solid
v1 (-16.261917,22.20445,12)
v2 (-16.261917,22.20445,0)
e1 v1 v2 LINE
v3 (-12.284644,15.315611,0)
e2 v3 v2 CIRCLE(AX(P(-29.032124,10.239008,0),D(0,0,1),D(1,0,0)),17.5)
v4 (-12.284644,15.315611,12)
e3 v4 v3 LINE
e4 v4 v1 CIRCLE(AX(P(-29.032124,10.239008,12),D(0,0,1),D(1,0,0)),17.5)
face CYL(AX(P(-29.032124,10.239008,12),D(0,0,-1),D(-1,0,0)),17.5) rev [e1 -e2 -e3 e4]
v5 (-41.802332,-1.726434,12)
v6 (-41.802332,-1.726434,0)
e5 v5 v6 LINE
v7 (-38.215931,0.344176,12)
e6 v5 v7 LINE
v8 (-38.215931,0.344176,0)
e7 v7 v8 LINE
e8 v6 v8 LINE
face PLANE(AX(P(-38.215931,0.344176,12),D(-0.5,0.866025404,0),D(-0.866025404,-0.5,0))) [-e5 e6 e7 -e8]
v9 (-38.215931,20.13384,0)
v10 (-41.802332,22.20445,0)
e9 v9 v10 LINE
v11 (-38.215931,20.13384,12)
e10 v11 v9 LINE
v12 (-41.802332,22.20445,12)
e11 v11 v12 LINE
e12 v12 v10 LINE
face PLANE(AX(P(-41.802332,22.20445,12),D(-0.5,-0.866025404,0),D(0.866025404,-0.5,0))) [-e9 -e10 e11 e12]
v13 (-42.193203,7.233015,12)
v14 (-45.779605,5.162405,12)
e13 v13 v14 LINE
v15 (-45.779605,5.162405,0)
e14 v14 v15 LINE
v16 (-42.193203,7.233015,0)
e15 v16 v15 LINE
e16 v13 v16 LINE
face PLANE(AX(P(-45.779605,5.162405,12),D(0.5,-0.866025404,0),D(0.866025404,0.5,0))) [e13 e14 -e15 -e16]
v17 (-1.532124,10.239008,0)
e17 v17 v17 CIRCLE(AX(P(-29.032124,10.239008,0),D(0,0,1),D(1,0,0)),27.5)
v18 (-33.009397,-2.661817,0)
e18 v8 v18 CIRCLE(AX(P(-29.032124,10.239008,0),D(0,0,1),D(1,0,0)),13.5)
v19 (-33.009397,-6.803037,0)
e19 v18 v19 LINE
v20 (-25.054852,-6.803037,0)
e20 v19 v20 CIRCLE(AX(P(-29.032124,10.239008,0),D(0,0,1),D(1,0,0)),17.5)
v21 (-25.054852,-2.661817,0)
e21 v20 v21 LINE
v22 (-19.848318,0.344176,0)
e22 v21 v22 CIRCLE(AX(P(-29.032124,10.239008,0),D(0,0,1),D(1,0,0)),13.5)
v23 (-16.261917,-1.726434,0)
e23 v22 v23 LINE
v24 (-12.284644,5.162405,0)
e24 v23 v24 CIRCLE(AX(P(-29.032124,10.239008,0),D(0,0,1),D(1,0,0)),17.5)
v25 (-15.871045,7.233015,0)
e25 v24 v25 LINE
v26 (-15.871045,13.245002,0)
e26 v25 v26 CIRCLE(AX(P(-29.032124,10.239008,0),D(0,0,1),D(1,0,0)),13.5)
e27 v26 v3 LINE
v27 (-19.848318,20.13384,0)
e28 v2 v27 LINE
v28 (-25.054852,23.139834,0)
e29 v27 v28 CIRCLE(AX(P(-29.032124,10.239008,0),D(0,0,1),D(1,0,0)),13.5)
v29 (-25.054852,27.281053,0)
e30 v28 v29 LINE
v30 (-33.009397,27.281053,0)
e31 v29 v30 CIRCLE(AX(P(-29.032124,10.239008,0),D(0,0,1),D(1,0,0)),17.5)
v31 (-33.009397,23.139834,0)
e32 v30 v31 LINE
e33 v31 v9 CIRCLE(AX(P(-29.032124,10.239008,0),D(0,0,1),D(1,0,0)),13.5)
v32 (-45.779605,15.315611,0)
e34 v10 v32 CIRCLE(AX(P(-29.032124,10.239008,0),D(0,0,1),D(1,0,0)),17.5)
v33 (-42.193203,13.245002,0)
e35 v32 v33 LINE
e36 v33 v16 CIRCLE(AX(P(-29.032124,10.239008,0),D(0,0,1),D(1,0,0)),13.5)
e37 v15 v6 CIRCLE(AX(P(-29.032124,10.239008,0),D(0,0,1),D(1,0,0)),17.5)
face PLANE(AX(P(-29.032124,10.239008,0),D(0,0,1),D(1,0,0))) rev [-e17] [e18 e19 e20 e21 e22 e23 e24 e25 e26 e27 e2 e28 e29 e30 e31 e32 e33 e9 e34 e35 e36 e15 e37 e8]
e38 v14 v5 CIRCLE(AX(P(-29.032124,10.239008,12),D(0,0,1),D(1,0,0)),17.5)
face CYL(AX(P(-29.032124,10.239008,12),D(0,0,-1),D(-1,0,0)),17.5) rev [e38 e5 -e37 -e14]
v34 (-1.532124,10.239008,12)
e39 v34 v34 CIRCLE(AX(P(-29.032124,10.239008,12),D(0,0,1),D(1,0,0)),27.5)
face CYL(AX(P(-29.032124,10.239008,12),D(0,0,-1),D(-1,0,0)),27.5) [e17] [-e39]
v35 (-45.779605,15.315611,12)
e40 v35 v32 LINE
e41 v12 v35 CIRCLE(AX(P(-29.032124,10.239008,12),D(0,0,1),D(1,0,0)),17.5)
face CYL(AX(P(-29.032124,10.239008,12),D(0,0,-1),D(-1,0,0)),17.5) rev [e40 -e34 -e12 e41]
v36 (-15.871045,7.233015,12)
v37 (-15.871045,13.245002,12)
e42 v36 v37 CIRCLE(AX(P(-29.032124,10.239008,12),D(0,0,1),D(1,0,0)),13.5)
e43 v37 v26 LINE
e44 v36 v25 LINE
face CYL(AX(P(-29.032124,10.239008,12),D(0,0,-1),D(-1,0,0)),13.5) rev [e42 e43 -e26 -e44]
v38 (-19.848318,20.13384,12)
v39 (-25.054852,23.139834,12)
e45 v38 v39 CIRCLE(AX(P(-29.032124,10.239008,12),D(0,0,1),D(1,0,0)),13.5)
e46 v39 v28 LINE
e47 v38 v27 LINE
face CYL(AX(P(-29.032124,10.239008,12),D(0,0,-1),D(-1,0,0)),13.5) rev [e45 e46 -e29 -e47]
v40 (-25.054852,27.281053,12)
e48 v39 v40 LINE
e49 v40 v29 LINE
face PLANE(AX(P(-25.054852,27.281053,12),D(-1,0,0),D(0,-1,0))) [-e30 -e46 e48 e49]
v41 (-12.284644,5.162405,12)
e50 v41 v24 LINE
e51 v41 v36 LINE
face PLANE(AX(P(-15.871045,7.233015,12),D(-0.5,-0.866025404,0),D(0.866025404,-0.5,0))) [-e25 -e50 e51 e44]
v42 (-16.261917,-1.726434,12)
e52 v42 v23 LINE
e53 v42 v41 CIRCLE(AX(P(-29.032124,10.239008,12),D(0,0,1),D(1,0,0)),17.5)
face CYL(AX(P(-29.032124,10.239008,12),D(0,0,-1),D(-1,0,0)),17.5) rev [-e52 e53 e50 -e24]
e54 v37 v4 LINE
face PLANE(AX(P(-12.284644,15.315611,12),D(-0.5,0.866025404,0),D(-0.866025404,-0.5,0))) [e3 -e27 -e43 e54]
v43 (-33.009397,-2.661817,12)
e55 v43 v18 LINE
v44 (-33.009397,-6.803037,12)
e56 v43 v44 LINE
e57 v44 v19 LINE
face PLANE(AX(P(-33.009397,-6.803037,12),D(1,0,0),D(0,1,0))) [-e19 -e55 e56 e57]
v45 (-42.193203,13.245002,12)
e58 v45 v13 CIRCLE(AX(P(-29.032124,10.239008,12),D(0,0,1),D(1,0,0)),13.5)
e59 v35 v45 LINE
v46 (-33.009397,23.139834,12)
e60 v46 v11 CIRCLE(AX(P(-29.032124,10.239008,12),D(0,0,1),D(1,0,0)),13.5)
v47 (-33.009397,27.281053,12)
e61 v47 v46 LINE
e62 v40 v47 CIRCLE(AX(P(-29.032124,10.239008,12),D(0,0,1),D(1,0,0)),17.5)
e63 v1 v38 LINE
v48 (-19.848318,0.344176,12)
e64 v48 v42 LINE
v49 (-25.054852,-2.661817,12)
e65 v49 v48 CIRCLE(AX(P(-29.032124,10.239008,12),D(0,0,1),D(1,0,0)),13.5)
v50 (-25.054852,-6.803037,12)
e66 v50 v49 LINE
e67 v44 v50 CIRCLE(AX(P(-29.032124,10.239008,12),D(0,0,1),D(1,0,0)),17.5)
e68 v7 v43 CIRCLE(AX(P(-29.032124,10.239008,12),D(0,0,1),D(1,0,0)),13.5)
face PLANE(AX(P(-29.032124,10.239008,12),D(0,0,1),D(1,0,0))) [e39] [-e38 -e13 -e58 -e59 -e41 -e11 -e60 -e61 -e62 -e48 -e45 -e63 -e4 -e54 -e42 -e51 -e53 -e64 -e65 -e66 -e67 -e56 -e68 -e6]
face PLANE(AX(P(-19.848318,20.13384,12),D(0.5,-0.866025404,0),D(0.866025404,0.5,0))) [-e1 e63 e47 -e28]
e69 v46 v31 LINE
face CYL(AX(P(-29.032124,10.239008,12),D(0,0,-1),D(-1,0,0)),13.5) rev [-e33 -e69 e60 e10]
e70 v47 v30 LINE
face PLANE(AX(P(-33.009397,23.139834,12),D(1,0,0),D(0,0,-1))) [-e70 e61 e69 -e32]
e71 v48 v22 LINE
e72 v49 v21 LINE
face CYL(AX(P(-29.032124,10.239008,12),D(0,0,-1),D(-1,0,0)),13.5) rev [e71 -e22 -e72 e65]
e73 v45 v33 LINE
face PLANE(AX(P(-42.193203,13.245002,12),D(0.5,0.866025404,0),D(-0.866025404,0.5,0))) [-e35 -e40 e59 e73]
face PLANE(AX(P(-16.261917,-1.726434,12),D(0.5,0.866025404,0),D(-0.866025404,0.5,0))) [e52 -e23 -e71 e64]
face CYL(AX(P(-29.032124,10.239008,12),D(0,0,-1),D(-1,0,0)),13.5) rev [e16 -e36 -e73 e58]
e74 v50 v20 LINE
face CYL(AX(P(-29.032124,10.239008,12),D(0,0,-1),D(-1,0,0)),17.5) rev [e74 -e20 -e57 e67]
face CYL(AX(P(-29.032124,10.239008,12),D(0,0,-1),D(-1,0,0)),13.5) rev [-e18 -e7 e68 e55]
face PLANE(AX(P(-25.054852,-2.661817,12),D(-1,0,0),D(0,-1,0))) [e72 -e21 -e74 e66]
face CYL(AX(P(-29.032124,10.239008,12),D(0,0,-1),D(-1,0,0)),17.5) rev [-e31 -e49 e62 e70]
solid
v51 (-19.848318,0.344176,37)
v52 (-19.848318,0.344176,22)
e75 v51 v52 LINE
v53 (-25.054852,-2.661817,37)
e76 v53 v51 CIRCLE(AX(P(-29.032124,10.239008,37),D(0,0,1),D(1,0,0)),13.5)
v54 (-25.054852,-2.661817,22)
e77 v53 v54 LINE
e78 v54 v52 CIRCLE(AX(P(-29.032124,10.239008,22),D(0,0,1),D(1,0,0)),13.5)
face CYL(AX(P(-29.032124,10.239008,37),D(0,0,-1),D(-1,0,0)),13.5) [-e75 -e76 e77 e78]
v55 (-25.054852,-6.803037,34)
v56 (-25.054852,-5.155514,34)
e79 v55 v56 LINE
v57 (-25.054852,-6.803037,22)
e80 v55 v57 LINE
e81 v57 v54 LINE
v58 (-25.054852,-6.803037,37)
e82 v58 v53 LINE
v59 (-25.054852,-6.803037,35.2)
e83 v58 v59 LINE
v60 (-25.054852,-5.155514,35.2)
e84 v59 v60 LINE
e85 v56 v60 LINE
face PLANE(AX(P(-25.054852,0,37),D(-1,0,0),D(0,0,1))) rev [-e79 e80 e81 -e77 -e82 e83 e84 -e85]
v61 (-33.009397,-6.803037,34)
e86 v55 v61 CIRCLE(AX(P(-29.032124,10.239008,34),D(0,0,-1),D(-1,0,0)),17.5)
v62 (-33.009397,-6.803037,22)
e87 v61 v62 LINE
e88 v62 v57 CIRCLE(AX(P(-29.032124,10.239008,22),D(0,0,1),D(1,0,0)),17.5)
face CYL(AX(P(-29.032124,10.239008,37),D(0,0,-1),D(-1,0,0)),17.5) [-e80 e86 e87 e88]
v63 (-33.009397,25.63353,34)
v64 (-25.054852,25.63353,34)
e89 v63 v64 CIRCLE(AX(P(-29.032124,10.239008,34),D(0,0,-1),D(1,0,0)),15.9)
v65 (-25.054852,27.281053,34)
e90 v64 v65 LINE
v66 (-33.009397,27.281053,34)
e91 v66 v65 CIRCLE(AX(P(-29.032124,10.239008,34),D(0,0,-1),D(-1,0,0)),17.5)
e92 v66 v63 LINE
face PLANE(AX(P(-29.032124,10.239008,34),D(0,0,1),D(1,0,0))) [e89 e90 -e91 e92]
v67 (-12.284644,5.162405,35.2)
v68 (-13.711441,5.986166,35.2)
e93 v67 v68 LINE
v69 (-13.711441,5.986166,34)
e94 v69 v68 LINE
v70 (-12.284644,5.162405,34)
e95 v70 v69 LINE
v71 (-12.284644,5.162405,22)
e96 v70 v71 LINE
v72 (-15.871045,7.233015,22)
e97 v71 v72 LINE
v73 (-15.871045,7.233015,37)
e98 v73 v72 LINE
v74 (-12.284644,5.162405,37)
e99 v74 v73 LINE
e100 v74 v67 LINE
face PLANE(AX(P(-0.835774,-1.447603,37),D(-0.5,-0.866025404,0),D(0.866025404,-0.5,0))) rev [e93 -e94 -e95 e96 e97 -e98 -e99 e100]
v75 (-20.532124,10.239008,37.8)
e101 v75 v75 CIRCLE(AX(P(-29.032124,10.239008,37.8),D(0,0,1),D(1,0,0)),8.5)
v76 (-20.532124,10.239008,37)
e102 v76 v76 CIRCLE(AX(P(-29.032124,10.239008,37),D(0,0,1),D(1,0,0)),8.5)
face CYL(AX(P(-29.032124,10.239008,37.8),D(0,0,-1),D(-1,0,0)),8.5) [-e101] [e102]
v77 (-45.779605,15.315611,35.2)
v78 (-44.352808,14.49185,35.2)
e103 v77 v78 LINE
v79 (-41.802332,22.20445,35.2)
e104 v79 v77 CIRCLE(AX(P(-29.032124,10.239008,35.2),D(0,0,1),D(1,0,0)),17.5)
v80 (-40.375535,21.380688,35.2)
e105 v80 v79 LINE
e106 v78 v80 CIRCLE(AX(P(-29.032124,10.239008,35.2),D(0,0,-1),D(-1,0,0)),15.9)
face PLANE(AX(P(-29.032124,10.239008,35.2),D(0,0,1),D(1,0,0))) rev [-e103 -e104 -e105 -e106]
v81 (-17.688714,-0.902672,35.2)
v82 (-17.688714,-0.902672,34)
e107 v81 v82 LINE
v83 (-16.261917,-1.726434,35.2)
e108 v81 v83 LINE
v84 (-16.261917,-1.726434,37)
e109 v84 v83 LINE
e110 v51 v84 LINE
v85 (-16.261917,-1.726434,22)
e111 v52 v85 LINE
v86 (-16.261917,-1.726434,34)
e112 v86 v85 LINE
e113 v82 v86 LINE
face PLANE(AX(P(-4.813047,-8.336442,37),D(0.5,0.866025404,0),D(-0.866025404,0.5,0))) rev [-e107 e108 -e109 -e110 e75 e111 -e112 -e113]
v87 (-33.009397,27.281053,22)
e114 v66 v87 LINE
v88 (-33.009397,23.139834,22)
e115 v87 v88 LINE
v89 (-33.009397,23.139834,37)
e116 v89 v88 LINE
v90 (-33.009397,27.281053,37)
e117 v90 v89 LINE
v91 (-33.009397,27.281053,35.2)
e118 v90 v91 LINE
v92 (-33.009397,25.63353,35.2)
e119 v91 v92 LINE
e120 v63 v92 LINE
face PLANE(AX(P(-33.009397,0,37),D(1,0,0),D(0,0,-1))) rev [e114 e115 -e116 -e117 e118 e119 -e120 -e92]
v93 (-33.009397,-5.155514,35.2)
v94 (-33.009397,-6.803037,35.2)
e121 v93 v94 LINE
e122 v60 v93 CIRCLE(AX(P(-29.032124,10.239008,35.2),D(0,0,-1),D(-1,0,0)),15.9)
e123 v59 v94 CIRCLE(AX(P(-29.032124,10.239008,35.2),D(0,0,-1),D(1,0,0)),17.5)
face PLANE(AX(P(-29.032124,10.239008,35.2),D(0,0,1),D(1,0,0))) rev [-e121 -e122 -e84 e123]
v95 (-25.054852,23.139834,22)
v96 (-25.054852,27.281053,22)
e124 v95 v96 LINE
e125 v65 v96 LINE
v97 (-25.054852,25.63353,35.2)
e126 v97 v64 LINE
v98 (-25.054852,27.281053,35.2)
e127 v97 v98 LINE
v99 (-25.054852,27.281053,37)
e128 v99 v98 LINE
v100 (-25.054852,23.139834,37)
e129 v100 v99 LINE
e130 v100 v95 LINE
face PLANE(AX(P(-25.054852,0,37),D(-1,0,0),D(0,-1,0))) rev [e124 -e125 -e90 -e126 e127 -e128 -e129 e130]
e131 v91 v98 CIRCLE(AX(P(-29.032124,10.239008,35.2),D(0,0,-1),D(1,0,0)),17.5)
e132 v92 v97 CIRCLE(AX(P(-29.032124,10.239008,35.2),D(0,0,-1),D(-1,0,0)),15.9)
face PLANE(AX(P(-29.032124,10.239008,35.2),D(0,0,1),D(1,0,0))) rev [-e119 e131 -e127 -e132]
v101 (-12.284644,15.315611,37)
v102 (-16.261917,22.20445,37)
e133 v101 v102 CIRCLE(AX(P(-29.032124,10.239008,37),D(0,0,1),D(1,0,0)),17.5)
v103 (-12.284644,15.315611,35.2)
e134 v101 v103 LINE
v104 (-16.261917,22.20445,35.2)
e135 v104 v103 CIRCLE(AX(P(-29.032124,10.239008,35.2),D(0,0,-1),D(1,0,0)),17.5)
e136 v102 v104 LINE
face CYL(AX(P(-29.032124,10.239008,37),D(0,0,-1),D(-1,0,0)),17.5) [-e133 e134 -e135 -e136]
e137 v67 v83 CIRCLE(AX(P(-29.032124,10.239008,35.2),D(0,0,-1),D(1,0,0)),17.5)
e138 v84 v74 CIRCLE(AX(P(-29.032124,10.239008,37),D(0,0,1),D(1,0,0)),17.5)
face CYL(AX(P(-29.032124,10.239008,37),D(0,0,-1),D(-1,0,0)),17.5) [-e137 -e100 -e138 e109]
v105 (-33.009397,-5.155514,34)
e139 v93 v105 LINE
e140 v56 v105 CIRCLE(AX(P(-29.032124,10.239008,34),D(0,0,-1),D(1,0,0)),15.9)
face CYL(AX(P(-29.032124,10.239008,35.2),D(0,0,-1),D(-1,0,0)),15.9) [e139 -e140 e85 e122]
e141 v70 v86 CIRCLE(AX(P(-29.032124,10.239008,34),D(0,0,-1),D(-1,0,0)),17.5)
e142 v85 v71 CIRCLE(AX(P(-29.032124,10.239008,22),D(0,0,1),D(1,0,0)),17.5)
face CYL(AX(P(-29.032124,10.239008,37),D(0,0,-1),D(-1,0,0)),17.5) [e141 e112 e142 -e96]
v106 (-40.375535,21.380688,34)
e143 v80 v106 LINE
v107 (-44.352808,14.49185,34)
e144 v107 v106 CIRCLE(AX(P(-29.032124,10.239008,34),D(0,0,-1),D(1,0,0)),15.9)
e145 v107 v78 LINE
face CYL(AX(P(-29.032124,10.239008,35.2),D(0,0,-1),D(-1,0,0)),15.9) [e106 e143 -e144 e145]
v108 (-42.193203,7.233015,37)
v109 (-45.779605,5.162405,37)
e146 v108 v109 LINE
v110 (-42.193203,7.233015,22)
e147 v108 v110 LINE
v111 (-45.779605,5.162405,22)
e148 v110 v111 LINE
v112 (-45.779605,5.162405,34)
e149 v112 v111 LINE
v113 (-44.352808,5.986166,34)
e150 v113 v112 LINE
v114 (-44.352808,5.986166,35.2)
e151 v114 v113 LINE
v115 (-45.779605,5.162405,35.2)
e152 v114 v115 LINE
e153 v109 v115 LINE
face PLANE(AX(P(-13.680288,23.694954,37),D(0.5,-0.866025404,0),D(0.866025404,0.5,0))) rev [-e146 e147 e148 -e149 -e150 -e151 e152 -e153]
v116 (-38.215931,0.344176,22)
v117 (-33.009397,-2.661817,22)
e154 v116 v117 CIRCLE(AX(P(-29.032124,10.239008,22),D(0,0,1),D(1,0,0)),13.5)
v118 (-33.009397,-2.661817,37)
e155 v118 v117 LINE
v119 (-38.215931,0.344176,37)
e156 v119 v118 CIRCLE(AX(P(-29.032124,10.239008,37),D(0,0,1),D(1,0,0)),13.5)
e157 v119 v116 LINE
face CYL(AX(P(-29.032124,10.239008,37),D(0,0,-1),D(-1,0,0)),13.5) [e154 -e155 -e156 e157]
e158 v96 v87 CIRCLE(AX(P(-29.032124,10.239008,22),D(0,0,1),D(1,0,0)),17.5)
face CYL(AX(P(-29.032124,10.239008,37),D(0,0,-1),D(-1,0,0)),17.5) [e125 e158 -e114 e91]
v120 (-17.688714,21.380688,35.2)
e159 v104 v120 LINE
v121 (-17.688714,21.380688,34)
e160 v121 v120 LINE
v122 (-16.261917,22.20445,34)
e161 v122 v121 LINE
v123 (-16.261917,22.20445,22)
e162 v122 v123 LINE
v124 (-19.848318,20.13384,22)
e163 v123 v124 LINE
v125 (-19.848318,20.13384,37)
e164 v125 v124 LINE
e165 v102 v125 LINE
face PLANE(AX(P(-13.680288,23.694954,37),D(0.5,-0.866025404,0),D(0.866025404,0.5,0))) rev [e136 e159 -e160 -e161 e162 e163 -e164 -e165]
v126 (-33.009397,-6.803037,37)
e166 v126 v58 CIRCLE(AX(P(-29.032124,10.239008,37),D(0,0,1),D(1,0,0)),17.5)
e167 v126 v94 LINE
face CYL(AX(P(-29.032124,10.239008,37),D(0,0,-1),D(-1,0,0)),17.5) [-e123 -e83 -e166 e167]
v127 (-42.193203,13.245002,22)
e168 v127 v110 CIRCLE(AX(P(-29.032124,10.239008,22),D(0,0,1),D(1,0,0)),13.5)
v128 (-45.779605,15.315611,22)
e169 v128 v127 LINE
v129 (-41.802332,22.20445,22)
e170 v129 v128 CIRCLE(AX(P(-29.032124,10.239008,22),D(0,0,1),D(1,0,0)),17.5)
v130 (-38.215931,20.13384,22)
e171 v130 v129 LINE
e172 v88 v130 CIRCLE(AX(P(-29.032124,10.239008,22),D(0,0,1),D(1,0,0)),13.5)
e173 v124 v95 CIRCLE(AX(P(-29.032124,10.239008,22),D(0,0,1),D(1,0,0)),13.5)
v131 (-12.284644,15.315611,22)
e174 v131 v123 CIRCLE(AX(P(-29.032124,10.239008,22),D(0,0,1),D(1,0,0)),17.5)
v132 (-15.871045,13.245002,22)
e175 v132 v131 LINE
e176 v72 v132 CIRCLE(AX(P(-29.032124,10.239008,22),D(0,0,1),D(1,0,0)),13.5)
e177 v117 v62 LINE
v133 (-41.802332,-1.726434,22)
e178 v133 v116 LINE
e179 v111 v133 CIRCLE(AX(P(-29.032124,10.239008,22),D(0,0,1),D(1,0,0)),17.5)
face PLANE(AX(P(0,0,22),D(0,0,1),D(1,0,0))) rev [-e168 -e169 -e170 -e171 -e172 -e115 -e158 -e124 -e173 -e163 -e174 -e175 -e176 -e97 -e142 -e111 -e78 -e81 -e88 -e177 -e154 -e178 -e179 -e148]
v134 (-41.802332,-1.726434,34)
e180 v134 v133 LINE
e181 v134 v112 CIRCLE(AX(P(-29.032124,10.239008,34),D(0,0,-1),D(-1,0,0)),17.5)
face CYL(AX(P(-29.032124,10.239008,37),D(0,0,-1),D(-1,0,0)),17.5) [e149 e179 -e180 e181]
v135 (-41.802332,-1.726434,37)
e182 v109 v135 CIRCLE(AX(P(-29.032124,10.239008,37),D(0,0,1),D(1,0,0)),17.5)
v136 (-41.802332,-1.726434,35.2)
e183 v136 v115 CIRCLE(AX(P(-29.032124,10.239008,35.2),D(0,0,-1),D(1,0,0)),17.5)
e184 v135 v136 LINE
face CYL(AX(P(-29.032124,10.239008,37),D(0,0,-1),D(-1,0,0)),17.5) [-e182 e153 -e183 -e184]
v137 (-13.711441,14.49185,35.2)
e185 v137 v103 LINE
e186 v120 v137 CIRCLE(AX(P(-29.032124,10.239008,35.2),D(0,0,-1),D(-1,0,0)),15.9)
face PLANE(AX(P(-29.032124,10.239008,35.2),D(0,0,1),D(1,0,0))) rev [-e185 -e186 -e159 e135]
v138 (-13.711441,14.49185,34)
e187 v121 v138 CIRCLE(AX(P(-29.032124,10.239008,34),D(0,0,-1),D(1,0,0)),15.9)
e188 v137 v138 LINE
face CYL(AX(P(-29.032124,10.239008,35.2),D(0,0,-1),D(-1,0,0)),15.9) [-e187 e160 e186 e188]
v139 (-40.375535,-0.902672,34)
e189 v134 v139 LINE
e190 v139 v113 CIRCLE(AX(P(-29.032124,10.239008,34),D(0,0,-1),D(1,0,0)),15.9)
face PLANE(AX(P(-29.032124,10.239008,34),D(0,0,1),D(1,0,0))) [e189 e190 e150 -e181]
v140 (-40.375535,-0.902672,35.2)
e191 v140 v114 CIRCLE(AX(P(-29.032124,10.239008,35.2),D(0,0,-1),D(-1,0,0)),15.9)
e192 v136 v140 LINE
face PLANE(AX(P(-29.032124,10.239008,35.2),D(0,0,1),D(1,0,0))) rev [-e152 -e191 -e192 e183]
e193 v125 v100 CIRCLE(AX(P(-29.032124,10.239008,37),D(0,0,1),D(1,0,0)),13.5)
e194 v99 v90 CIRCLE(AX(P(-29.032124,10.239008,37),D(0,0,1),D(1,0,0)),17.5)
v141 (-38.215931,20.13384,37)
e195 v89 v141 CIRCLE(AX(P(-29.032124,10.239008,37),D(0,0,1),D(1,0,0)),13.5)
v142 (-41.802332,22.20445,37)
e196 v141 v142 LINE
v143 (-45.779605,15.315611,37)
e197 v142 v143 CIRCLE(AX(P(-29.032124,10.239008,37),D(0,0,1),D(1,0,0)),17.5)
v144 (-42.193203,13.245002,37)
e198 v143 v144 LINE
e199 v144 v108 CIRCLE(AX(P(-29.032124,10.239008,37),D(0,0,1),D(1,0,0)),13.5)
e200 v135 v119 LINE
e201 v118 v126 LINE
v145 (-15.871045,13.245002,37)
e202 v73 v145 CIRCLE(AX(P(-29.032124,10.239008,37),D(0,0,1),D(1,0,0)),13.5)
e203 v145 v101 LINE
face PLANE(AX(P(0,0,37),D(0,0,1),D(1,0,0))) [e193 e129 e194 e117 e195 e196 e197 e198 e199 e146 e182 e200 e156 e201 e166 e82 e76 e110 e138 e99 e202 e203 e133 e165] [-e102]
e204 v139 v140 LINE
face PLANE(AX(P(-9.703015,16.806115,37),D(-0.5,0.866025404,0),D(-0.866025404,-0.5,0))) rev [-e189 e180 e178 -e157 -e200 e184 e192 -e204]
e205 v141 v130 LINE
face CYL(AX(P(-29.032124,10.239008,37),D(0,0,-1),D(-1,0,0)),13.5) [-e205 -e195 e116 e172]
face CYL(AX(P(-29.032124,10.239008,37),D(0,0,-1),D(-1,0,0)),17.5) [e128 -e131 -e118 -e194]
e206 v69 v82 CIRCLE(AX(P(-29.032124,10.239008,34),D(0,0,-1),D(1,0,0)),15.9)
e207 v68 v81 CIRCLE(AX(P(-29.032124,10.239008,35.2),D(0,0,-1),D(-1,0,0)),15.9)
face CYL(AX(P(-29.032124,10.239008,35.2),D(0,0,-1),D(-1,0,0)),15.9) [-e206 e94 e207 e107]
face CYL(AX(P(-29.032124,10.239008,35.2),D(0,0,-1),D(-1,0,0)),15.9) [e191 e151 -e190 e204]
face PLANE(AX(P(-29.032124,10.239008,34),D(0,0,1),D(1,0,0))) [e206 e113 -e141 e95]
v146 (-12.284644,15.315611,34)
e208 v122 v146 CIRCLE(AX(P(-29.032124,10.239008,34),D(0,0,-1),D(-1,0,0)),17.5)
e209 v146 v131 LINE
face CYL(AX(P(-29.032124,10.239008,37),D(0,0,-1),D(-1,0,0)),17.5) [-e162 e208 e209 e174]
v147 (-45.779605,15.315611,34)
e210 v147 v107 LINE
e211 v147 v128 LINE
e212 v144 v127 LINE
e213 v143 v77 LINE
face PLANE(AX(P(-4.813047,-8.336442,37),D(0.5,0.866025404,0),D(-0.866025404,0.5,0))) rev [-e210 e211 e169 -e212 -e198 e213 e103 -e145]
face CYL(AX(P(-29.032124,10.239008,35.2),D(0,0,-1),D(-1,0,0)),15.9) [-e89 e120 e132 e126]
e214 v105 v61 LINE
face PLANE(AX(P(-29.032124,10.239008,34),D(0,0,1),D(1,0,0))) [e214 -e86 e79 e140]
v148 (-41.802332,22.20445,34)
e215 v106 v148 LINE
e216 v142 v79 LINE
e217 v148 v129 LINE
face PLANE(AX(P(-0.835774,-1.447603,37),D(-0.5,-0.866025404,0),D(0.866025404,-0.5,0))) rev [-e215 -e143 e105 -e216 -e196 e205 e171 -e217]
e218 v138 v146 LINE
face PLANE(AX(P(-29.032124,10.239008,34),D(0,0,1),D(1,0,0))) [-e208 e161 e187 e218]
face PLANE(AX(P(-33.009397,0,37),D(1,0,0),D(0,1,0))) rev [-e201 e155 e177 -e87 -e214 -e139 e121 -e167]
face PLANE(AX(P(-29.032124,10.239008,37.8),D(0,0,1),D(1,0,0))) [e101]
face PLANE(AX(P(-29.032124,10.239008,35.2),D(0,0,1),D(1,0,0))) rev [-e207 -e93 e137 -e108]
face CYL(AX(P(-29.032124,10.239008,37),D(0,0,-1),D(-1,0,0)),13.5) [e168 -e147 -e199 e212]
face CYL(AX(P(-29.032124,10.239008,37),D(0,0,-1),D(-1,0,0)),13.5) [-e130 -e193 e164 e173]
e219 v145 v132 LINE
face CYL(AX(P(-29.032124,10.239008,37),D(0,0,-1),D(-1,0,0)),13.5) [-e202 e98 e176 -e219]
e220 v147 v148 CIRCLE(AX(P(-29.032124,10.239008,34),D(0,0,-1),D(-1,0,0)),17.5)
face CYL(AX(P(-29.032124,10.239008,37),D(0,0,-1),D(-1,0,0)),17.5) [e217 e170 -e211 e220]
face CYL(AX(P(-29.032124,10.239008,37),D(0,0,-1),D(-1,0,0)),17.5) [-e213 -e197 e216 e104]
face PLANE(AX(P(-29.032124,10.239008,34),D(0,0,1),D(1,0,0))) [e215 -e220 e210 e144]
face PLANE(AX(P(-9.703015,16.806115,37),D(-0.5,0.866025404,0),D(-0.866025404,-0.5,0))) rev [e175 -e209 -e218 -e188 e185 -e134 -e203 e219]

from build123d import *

# Parameters (mm, degrees)
TIRE_OUTBOARD_SPLINES_OUTLINE_R = 27.5
TIRE_OUTBOARD_SPLINES_DEPTH     = 12
BOSS_EXTRUDE1_DEPTH             = 15
CUT_EXTRUDE1_DEPTH              = 1.2
SKETCH4_R                       = 8.5
BOSS_EXTRUDE2_DEPTH             = 0.8


# Read off the part's stored shape, not the designer's step: Tire_Outboard_Splines
with BuildPart() as part:
    # Tire_Outboard_Splines outline → Tire_Outboard_Splines (new body)
    with BuildSketch(Plane.XY):
        with Locations((-29.032124352, 10.239008142)):
            Circle(TIRE_OUTBOARD_SPLINES_OUTLINE_R)
        with BuildLine():
            Line((-41.802331989, 22.204449918), (-38.215930705, 20.133840171))
            ThreePointArc((-38.215930705, 20.133840171), (-35.782124353, 21.930351093), (-33.00939708, 23.139833761))
            Line((-33.00939708, 23.139833761), (-33.00939708, 27.281053256))
            ThreePointArc((-33.00939708, 27.281053256), (-29.032124353, 27.739008142), (-25.054851625, 27.281053256))
            Line((-25.054851625, 27.281053256), (-25.054851625, 23.139833761))
            ThreePointArc((-25.054851625, 23.139833761), (-22.282124352, 21.930351093), (-19.848318, 20.133840171))
            Line((-19.848318, 20.133840171), (-16.261916715, 22.204449918))
            ThreePointArc((-16.261916715, 22.204449918), (-13.876679786, 18.989008142), (-12.284643988, 15.315611479))
            Line((-12.284643988, 15.315611479), (-15.871045273, 13.245001732))
            ThreePointArc((-15.871045273, 13.245001732), (-15.532124352, 10.239008142), (-15.871045273, 7.233014552))
            Line((-15.871045273, 7.233014552), (-12.284643988, 5.162404805))
            ThreePointArc((-12.284643988, 5.162404805), (-13.876679786, 1.489008142), (-16.261916715, -1.726433634))
            Line((-16.261916715, -1.726433634), (-19.848318, 0.344176113))
            ThreePointArc((-19.848318, 0.344176113), (-22.282124352, -1.452334809), (-25.054851625, -2.661817477))
            Line((-25.054851625, -2.661817477), (-25.054851625, -6.803036971))
            ThreePointArc((-25.054851625, -6.803036971), (-29.032124352, -7.260991858), (-33.00939708, -6.803036971))
            Line((-33.00939708, -6.803036971), (-33.00939708, -2.661817477))
            ThreePointArc((-33.00939708, -2.661817477), (-35.782124353, -1.452334809), (-38.215930705, 0.344176113))
            Line((-38.215930705, 0.344176113), (-41.802331989, -1.726433634))
            ThreePointArc((-41.802331989, -1.726433634), (-44.187568919, 1.489008142), (-45.779604717, 5.162404805))
            Line((-45.779604717, 5.162404805), (-42.193203432, 7.233014552))
            ThreePointArc((-42.193203432, 7.233014552), (-42.532124352, 10.239008142), (-42.193203432, 13.245001732))
            Line((-42.193203432, 13.245001732), (-45.779604717, 15.315611479))
            ThreePointArc((-45.779604717, 15.315611479), (-44.187568919, 18.989008142), (-41.802331989, 22.204449918))
        make_face(mode=Mode.SUBTRACT)
    extrude(amount=TIRE_OUTBOARD_SPLINES_DEPTH)


with BuildPart() as body_2:
    # Sketch3 → Boss-Extrude1 (new body)
    with BuildSketch(Plane.XY.offset(22)):
        with BuildLine():
            Line((-45.779604717, 15.315611479), (-42.193203432, 13.245001732))
            ThreePointArc((-42.193203432, 13.245001732), (-42.532124352, 10.239008142), (-42.193203432, 7.233014552))
            Line((-42.193203432, 7.233014552), (-45.779604717, 5.162404805))
            ThreePointArc((-45.779604717, 5.162404805), (-44.187568919, 1.489008142), (-41.802331989, -1.726433634))
            Line((-41.802331989, -1.726433634), (-38.215930705, 0.344176113))
            ThreePointArc((-38.215930705, 0.344176113), (-35.782124352, -1.452334809), (-33.00939708, -2.661817477))
            Line((-33.00939708, -2.661817477), (-33.00939708, -6.803036971))
            ThreePointArc((-33.00939708, -6.803036971), (-29.032124352, -7.260991858), (-25.054851625, -6.803036971))
            Line((-25.054851625, -6.803036971), (-25.054851625, -2.661817477))
            ThreePointArc((-25.054851625, -2.661817477), (-22.282124352, -1.452334809), (-19.848318, 0.344176113))
            Line((-19.848318, 0.344176113), (-16.261916715, -1.726433634))
            ThreePointArc((-16.261916715, -1.726433634), (-13.876679786, 1.489008142), (-12.284643988, 5.162404805))
            Line((-12.284643988, 5.162404805), (-15.871045273, 7.233014552))
            ThreePointArc((-15.871045273, 7.233014552), (-15.532124352, 10.239008142), (-15.871045273, 13.245001732))
            Line((-15.871045273, 13.245001732), (-12.284643988, 15.315611479))
            ThreePointArc((-12.284643988, 15.315611479), (-13.876679786, 18.989008142), (-16.261916715, 22.204449918))
            Line((-16.261916715, 22.204449918), (-19.848318, 20.133840171))
            ThreePointArc((-19.848318, 20.133840171), (-22.282124352, 21.930351093), (-25.054851625, 23.139833761))
            Line((-25.054851625, 23.139833761), (-25.054851625, 27.281053256))
            ThreePointArc((-25.054851625, 27.281053256), (-29.032124352, 27.739008142), (-33.00939708, 27.281053256))
            Line((-33.00939708, 27.281053256), (-33.00939708, 23.139833761))
            ThreePointArc((-33.00939708, 23.139833761), (-35.782124352, 21.930351093), (-38.215930705, 20.133840171))
            Line((-38.215930705, 20.133840171), (-41.802331989, 22.204449918))
            ThreePointArc((-41.802331989, 22.204449918), (-44.187568919, 18.989008142), (-45.779604717, 15.315611479))
        make_face()
    extrude(amount=BOSS_EXTRUDE1_DEPTH)

    # Sketch5 → Cut-Extrude1 (cut)
    with BuildSketch(Plane(origin=(0, 0, 34), x_dir=(-1, 0, 0), z_dir=(0, 0, -1))):
        with BuildLine():
            ThreePointArc((16.261916715, 22.204449918), (13.876679786, 18.989008142), (12.284643988, 15.315611479))
            ThreePointArc((12.284643988, 15.315611479), (11.532124352, 10.239008142), (12.284643988, 5.162404805))
            ThreePointArc((12.284643988, 5.162404805), (13.876679786, 1.489008142), (16.261916715, -1.726433634))
            ThreePointArc((16.261916715, -1.726433634), (20.282124352, -4.916436424), (25.054851625, -6.803036971))
            ThreePointArc((25.054851625, -6.803036971), (29.032124352, -7.260991858), (33.00939708, -6.803036971))
            ThreePointArc((33.00939708, -6.803036971), (37.782124352, -4.916436424), (41.802331989, -1.726433634))
            ThreePointArc((41.802331989, -1.726433634), (44.187568919, 1.489008142), (45.779604717, 5.162404805))
            ThreePointArc((45.779604717, 5.162404805), (46.532124352, 10.239008142), (45.779604717, 15.315611479))
            ThreePointArc((45.779604717, 15.315611479), (44.187568919, 18.989008142), (41.802331989, 22.204449918))
            ThreePointArc((41.802331989, 22.204449918), (37.782124352, 25.394452708), (33.00939708, 27.281053256))
            ThreePointArc((33.00939708, 27.281053256), (29.032124352, 27.739008142), (25.054851625, 27.281053256))
            ThreePointArc((25.054851625, 27.281053256), (20.282124352, 25.394452708), (16.261916715, 22.204449918))
        make_face()
        with BuildLine():
            ThreePointArc((13.815842193, 5.626551396), (13.132124352, 10.239008142), (13.815842193, 14.851464888))
            ThreePointArc((13.815842193, 14.851464888), (15.262320432, 18.189008142), (17.429478556, 21.11046667))
            ThreePointArc((17.429478556, 21.11046667), (21.082124352, 24.008812062), (25.418487989, 25.722923417))
            ThreePointArc((25.418487989, 25.722923417), (29.032124352, 26.139008142), (32.645760716, 25.722923417))
            ThreePointArc((32.645760716, 25.722923417), (36.982124352, 24.008812062), (40.634770148, 21.11046667))
            ThreePointArc((40.634770148, 21.11046667), (42.801928273, 18.189008142), (44.248406512, 14.851464888))
            ThreePointArc((44.248406512, 14.851464888), (44.932124352, 10.239008142), (44.248406512, 5.626551396))
            ThreePointArc((44.248406512, 5.626551396), (42.801928273, 2.289008142), (40.634770148, -0.632450386))
            ThreePointArc((40.634770148, -0.632450386), (36.982124352, -3.530795778), (32.645760716, -5.244907132))
            ThreePointArc((32.645760716, -5.244907132), (29.032124352, -5.660991858), (25.418487989, -5.244907132))
            ThreePointArc((25.418487989, -5.244907132), (21.082124352, -3.530795778), (17.429478556, -0.632450386))
            ThreePointArc((17.429478556, -0.632450386), (15.262320432, 2.289008142), (13.815842193, 5.626551396))
        make_face(mode=Mode.SUBTRACT)
    extrude(amount=-CUT_EXTRUDE1_DEPTH, mode=Mode.SUBTRACT)

    # Sketch4 → Boss-Extrude2 (add)
    with BuildSketch(Plane.XY.offset(37)):
        with Locations((-29.032124352, 10.239008142)):
            Circle(SKETCH4_R)
    extrude(amount=BOSS_EXTRUDE2_DEPTH)


solid = Compound([part.part, body_2.part])
